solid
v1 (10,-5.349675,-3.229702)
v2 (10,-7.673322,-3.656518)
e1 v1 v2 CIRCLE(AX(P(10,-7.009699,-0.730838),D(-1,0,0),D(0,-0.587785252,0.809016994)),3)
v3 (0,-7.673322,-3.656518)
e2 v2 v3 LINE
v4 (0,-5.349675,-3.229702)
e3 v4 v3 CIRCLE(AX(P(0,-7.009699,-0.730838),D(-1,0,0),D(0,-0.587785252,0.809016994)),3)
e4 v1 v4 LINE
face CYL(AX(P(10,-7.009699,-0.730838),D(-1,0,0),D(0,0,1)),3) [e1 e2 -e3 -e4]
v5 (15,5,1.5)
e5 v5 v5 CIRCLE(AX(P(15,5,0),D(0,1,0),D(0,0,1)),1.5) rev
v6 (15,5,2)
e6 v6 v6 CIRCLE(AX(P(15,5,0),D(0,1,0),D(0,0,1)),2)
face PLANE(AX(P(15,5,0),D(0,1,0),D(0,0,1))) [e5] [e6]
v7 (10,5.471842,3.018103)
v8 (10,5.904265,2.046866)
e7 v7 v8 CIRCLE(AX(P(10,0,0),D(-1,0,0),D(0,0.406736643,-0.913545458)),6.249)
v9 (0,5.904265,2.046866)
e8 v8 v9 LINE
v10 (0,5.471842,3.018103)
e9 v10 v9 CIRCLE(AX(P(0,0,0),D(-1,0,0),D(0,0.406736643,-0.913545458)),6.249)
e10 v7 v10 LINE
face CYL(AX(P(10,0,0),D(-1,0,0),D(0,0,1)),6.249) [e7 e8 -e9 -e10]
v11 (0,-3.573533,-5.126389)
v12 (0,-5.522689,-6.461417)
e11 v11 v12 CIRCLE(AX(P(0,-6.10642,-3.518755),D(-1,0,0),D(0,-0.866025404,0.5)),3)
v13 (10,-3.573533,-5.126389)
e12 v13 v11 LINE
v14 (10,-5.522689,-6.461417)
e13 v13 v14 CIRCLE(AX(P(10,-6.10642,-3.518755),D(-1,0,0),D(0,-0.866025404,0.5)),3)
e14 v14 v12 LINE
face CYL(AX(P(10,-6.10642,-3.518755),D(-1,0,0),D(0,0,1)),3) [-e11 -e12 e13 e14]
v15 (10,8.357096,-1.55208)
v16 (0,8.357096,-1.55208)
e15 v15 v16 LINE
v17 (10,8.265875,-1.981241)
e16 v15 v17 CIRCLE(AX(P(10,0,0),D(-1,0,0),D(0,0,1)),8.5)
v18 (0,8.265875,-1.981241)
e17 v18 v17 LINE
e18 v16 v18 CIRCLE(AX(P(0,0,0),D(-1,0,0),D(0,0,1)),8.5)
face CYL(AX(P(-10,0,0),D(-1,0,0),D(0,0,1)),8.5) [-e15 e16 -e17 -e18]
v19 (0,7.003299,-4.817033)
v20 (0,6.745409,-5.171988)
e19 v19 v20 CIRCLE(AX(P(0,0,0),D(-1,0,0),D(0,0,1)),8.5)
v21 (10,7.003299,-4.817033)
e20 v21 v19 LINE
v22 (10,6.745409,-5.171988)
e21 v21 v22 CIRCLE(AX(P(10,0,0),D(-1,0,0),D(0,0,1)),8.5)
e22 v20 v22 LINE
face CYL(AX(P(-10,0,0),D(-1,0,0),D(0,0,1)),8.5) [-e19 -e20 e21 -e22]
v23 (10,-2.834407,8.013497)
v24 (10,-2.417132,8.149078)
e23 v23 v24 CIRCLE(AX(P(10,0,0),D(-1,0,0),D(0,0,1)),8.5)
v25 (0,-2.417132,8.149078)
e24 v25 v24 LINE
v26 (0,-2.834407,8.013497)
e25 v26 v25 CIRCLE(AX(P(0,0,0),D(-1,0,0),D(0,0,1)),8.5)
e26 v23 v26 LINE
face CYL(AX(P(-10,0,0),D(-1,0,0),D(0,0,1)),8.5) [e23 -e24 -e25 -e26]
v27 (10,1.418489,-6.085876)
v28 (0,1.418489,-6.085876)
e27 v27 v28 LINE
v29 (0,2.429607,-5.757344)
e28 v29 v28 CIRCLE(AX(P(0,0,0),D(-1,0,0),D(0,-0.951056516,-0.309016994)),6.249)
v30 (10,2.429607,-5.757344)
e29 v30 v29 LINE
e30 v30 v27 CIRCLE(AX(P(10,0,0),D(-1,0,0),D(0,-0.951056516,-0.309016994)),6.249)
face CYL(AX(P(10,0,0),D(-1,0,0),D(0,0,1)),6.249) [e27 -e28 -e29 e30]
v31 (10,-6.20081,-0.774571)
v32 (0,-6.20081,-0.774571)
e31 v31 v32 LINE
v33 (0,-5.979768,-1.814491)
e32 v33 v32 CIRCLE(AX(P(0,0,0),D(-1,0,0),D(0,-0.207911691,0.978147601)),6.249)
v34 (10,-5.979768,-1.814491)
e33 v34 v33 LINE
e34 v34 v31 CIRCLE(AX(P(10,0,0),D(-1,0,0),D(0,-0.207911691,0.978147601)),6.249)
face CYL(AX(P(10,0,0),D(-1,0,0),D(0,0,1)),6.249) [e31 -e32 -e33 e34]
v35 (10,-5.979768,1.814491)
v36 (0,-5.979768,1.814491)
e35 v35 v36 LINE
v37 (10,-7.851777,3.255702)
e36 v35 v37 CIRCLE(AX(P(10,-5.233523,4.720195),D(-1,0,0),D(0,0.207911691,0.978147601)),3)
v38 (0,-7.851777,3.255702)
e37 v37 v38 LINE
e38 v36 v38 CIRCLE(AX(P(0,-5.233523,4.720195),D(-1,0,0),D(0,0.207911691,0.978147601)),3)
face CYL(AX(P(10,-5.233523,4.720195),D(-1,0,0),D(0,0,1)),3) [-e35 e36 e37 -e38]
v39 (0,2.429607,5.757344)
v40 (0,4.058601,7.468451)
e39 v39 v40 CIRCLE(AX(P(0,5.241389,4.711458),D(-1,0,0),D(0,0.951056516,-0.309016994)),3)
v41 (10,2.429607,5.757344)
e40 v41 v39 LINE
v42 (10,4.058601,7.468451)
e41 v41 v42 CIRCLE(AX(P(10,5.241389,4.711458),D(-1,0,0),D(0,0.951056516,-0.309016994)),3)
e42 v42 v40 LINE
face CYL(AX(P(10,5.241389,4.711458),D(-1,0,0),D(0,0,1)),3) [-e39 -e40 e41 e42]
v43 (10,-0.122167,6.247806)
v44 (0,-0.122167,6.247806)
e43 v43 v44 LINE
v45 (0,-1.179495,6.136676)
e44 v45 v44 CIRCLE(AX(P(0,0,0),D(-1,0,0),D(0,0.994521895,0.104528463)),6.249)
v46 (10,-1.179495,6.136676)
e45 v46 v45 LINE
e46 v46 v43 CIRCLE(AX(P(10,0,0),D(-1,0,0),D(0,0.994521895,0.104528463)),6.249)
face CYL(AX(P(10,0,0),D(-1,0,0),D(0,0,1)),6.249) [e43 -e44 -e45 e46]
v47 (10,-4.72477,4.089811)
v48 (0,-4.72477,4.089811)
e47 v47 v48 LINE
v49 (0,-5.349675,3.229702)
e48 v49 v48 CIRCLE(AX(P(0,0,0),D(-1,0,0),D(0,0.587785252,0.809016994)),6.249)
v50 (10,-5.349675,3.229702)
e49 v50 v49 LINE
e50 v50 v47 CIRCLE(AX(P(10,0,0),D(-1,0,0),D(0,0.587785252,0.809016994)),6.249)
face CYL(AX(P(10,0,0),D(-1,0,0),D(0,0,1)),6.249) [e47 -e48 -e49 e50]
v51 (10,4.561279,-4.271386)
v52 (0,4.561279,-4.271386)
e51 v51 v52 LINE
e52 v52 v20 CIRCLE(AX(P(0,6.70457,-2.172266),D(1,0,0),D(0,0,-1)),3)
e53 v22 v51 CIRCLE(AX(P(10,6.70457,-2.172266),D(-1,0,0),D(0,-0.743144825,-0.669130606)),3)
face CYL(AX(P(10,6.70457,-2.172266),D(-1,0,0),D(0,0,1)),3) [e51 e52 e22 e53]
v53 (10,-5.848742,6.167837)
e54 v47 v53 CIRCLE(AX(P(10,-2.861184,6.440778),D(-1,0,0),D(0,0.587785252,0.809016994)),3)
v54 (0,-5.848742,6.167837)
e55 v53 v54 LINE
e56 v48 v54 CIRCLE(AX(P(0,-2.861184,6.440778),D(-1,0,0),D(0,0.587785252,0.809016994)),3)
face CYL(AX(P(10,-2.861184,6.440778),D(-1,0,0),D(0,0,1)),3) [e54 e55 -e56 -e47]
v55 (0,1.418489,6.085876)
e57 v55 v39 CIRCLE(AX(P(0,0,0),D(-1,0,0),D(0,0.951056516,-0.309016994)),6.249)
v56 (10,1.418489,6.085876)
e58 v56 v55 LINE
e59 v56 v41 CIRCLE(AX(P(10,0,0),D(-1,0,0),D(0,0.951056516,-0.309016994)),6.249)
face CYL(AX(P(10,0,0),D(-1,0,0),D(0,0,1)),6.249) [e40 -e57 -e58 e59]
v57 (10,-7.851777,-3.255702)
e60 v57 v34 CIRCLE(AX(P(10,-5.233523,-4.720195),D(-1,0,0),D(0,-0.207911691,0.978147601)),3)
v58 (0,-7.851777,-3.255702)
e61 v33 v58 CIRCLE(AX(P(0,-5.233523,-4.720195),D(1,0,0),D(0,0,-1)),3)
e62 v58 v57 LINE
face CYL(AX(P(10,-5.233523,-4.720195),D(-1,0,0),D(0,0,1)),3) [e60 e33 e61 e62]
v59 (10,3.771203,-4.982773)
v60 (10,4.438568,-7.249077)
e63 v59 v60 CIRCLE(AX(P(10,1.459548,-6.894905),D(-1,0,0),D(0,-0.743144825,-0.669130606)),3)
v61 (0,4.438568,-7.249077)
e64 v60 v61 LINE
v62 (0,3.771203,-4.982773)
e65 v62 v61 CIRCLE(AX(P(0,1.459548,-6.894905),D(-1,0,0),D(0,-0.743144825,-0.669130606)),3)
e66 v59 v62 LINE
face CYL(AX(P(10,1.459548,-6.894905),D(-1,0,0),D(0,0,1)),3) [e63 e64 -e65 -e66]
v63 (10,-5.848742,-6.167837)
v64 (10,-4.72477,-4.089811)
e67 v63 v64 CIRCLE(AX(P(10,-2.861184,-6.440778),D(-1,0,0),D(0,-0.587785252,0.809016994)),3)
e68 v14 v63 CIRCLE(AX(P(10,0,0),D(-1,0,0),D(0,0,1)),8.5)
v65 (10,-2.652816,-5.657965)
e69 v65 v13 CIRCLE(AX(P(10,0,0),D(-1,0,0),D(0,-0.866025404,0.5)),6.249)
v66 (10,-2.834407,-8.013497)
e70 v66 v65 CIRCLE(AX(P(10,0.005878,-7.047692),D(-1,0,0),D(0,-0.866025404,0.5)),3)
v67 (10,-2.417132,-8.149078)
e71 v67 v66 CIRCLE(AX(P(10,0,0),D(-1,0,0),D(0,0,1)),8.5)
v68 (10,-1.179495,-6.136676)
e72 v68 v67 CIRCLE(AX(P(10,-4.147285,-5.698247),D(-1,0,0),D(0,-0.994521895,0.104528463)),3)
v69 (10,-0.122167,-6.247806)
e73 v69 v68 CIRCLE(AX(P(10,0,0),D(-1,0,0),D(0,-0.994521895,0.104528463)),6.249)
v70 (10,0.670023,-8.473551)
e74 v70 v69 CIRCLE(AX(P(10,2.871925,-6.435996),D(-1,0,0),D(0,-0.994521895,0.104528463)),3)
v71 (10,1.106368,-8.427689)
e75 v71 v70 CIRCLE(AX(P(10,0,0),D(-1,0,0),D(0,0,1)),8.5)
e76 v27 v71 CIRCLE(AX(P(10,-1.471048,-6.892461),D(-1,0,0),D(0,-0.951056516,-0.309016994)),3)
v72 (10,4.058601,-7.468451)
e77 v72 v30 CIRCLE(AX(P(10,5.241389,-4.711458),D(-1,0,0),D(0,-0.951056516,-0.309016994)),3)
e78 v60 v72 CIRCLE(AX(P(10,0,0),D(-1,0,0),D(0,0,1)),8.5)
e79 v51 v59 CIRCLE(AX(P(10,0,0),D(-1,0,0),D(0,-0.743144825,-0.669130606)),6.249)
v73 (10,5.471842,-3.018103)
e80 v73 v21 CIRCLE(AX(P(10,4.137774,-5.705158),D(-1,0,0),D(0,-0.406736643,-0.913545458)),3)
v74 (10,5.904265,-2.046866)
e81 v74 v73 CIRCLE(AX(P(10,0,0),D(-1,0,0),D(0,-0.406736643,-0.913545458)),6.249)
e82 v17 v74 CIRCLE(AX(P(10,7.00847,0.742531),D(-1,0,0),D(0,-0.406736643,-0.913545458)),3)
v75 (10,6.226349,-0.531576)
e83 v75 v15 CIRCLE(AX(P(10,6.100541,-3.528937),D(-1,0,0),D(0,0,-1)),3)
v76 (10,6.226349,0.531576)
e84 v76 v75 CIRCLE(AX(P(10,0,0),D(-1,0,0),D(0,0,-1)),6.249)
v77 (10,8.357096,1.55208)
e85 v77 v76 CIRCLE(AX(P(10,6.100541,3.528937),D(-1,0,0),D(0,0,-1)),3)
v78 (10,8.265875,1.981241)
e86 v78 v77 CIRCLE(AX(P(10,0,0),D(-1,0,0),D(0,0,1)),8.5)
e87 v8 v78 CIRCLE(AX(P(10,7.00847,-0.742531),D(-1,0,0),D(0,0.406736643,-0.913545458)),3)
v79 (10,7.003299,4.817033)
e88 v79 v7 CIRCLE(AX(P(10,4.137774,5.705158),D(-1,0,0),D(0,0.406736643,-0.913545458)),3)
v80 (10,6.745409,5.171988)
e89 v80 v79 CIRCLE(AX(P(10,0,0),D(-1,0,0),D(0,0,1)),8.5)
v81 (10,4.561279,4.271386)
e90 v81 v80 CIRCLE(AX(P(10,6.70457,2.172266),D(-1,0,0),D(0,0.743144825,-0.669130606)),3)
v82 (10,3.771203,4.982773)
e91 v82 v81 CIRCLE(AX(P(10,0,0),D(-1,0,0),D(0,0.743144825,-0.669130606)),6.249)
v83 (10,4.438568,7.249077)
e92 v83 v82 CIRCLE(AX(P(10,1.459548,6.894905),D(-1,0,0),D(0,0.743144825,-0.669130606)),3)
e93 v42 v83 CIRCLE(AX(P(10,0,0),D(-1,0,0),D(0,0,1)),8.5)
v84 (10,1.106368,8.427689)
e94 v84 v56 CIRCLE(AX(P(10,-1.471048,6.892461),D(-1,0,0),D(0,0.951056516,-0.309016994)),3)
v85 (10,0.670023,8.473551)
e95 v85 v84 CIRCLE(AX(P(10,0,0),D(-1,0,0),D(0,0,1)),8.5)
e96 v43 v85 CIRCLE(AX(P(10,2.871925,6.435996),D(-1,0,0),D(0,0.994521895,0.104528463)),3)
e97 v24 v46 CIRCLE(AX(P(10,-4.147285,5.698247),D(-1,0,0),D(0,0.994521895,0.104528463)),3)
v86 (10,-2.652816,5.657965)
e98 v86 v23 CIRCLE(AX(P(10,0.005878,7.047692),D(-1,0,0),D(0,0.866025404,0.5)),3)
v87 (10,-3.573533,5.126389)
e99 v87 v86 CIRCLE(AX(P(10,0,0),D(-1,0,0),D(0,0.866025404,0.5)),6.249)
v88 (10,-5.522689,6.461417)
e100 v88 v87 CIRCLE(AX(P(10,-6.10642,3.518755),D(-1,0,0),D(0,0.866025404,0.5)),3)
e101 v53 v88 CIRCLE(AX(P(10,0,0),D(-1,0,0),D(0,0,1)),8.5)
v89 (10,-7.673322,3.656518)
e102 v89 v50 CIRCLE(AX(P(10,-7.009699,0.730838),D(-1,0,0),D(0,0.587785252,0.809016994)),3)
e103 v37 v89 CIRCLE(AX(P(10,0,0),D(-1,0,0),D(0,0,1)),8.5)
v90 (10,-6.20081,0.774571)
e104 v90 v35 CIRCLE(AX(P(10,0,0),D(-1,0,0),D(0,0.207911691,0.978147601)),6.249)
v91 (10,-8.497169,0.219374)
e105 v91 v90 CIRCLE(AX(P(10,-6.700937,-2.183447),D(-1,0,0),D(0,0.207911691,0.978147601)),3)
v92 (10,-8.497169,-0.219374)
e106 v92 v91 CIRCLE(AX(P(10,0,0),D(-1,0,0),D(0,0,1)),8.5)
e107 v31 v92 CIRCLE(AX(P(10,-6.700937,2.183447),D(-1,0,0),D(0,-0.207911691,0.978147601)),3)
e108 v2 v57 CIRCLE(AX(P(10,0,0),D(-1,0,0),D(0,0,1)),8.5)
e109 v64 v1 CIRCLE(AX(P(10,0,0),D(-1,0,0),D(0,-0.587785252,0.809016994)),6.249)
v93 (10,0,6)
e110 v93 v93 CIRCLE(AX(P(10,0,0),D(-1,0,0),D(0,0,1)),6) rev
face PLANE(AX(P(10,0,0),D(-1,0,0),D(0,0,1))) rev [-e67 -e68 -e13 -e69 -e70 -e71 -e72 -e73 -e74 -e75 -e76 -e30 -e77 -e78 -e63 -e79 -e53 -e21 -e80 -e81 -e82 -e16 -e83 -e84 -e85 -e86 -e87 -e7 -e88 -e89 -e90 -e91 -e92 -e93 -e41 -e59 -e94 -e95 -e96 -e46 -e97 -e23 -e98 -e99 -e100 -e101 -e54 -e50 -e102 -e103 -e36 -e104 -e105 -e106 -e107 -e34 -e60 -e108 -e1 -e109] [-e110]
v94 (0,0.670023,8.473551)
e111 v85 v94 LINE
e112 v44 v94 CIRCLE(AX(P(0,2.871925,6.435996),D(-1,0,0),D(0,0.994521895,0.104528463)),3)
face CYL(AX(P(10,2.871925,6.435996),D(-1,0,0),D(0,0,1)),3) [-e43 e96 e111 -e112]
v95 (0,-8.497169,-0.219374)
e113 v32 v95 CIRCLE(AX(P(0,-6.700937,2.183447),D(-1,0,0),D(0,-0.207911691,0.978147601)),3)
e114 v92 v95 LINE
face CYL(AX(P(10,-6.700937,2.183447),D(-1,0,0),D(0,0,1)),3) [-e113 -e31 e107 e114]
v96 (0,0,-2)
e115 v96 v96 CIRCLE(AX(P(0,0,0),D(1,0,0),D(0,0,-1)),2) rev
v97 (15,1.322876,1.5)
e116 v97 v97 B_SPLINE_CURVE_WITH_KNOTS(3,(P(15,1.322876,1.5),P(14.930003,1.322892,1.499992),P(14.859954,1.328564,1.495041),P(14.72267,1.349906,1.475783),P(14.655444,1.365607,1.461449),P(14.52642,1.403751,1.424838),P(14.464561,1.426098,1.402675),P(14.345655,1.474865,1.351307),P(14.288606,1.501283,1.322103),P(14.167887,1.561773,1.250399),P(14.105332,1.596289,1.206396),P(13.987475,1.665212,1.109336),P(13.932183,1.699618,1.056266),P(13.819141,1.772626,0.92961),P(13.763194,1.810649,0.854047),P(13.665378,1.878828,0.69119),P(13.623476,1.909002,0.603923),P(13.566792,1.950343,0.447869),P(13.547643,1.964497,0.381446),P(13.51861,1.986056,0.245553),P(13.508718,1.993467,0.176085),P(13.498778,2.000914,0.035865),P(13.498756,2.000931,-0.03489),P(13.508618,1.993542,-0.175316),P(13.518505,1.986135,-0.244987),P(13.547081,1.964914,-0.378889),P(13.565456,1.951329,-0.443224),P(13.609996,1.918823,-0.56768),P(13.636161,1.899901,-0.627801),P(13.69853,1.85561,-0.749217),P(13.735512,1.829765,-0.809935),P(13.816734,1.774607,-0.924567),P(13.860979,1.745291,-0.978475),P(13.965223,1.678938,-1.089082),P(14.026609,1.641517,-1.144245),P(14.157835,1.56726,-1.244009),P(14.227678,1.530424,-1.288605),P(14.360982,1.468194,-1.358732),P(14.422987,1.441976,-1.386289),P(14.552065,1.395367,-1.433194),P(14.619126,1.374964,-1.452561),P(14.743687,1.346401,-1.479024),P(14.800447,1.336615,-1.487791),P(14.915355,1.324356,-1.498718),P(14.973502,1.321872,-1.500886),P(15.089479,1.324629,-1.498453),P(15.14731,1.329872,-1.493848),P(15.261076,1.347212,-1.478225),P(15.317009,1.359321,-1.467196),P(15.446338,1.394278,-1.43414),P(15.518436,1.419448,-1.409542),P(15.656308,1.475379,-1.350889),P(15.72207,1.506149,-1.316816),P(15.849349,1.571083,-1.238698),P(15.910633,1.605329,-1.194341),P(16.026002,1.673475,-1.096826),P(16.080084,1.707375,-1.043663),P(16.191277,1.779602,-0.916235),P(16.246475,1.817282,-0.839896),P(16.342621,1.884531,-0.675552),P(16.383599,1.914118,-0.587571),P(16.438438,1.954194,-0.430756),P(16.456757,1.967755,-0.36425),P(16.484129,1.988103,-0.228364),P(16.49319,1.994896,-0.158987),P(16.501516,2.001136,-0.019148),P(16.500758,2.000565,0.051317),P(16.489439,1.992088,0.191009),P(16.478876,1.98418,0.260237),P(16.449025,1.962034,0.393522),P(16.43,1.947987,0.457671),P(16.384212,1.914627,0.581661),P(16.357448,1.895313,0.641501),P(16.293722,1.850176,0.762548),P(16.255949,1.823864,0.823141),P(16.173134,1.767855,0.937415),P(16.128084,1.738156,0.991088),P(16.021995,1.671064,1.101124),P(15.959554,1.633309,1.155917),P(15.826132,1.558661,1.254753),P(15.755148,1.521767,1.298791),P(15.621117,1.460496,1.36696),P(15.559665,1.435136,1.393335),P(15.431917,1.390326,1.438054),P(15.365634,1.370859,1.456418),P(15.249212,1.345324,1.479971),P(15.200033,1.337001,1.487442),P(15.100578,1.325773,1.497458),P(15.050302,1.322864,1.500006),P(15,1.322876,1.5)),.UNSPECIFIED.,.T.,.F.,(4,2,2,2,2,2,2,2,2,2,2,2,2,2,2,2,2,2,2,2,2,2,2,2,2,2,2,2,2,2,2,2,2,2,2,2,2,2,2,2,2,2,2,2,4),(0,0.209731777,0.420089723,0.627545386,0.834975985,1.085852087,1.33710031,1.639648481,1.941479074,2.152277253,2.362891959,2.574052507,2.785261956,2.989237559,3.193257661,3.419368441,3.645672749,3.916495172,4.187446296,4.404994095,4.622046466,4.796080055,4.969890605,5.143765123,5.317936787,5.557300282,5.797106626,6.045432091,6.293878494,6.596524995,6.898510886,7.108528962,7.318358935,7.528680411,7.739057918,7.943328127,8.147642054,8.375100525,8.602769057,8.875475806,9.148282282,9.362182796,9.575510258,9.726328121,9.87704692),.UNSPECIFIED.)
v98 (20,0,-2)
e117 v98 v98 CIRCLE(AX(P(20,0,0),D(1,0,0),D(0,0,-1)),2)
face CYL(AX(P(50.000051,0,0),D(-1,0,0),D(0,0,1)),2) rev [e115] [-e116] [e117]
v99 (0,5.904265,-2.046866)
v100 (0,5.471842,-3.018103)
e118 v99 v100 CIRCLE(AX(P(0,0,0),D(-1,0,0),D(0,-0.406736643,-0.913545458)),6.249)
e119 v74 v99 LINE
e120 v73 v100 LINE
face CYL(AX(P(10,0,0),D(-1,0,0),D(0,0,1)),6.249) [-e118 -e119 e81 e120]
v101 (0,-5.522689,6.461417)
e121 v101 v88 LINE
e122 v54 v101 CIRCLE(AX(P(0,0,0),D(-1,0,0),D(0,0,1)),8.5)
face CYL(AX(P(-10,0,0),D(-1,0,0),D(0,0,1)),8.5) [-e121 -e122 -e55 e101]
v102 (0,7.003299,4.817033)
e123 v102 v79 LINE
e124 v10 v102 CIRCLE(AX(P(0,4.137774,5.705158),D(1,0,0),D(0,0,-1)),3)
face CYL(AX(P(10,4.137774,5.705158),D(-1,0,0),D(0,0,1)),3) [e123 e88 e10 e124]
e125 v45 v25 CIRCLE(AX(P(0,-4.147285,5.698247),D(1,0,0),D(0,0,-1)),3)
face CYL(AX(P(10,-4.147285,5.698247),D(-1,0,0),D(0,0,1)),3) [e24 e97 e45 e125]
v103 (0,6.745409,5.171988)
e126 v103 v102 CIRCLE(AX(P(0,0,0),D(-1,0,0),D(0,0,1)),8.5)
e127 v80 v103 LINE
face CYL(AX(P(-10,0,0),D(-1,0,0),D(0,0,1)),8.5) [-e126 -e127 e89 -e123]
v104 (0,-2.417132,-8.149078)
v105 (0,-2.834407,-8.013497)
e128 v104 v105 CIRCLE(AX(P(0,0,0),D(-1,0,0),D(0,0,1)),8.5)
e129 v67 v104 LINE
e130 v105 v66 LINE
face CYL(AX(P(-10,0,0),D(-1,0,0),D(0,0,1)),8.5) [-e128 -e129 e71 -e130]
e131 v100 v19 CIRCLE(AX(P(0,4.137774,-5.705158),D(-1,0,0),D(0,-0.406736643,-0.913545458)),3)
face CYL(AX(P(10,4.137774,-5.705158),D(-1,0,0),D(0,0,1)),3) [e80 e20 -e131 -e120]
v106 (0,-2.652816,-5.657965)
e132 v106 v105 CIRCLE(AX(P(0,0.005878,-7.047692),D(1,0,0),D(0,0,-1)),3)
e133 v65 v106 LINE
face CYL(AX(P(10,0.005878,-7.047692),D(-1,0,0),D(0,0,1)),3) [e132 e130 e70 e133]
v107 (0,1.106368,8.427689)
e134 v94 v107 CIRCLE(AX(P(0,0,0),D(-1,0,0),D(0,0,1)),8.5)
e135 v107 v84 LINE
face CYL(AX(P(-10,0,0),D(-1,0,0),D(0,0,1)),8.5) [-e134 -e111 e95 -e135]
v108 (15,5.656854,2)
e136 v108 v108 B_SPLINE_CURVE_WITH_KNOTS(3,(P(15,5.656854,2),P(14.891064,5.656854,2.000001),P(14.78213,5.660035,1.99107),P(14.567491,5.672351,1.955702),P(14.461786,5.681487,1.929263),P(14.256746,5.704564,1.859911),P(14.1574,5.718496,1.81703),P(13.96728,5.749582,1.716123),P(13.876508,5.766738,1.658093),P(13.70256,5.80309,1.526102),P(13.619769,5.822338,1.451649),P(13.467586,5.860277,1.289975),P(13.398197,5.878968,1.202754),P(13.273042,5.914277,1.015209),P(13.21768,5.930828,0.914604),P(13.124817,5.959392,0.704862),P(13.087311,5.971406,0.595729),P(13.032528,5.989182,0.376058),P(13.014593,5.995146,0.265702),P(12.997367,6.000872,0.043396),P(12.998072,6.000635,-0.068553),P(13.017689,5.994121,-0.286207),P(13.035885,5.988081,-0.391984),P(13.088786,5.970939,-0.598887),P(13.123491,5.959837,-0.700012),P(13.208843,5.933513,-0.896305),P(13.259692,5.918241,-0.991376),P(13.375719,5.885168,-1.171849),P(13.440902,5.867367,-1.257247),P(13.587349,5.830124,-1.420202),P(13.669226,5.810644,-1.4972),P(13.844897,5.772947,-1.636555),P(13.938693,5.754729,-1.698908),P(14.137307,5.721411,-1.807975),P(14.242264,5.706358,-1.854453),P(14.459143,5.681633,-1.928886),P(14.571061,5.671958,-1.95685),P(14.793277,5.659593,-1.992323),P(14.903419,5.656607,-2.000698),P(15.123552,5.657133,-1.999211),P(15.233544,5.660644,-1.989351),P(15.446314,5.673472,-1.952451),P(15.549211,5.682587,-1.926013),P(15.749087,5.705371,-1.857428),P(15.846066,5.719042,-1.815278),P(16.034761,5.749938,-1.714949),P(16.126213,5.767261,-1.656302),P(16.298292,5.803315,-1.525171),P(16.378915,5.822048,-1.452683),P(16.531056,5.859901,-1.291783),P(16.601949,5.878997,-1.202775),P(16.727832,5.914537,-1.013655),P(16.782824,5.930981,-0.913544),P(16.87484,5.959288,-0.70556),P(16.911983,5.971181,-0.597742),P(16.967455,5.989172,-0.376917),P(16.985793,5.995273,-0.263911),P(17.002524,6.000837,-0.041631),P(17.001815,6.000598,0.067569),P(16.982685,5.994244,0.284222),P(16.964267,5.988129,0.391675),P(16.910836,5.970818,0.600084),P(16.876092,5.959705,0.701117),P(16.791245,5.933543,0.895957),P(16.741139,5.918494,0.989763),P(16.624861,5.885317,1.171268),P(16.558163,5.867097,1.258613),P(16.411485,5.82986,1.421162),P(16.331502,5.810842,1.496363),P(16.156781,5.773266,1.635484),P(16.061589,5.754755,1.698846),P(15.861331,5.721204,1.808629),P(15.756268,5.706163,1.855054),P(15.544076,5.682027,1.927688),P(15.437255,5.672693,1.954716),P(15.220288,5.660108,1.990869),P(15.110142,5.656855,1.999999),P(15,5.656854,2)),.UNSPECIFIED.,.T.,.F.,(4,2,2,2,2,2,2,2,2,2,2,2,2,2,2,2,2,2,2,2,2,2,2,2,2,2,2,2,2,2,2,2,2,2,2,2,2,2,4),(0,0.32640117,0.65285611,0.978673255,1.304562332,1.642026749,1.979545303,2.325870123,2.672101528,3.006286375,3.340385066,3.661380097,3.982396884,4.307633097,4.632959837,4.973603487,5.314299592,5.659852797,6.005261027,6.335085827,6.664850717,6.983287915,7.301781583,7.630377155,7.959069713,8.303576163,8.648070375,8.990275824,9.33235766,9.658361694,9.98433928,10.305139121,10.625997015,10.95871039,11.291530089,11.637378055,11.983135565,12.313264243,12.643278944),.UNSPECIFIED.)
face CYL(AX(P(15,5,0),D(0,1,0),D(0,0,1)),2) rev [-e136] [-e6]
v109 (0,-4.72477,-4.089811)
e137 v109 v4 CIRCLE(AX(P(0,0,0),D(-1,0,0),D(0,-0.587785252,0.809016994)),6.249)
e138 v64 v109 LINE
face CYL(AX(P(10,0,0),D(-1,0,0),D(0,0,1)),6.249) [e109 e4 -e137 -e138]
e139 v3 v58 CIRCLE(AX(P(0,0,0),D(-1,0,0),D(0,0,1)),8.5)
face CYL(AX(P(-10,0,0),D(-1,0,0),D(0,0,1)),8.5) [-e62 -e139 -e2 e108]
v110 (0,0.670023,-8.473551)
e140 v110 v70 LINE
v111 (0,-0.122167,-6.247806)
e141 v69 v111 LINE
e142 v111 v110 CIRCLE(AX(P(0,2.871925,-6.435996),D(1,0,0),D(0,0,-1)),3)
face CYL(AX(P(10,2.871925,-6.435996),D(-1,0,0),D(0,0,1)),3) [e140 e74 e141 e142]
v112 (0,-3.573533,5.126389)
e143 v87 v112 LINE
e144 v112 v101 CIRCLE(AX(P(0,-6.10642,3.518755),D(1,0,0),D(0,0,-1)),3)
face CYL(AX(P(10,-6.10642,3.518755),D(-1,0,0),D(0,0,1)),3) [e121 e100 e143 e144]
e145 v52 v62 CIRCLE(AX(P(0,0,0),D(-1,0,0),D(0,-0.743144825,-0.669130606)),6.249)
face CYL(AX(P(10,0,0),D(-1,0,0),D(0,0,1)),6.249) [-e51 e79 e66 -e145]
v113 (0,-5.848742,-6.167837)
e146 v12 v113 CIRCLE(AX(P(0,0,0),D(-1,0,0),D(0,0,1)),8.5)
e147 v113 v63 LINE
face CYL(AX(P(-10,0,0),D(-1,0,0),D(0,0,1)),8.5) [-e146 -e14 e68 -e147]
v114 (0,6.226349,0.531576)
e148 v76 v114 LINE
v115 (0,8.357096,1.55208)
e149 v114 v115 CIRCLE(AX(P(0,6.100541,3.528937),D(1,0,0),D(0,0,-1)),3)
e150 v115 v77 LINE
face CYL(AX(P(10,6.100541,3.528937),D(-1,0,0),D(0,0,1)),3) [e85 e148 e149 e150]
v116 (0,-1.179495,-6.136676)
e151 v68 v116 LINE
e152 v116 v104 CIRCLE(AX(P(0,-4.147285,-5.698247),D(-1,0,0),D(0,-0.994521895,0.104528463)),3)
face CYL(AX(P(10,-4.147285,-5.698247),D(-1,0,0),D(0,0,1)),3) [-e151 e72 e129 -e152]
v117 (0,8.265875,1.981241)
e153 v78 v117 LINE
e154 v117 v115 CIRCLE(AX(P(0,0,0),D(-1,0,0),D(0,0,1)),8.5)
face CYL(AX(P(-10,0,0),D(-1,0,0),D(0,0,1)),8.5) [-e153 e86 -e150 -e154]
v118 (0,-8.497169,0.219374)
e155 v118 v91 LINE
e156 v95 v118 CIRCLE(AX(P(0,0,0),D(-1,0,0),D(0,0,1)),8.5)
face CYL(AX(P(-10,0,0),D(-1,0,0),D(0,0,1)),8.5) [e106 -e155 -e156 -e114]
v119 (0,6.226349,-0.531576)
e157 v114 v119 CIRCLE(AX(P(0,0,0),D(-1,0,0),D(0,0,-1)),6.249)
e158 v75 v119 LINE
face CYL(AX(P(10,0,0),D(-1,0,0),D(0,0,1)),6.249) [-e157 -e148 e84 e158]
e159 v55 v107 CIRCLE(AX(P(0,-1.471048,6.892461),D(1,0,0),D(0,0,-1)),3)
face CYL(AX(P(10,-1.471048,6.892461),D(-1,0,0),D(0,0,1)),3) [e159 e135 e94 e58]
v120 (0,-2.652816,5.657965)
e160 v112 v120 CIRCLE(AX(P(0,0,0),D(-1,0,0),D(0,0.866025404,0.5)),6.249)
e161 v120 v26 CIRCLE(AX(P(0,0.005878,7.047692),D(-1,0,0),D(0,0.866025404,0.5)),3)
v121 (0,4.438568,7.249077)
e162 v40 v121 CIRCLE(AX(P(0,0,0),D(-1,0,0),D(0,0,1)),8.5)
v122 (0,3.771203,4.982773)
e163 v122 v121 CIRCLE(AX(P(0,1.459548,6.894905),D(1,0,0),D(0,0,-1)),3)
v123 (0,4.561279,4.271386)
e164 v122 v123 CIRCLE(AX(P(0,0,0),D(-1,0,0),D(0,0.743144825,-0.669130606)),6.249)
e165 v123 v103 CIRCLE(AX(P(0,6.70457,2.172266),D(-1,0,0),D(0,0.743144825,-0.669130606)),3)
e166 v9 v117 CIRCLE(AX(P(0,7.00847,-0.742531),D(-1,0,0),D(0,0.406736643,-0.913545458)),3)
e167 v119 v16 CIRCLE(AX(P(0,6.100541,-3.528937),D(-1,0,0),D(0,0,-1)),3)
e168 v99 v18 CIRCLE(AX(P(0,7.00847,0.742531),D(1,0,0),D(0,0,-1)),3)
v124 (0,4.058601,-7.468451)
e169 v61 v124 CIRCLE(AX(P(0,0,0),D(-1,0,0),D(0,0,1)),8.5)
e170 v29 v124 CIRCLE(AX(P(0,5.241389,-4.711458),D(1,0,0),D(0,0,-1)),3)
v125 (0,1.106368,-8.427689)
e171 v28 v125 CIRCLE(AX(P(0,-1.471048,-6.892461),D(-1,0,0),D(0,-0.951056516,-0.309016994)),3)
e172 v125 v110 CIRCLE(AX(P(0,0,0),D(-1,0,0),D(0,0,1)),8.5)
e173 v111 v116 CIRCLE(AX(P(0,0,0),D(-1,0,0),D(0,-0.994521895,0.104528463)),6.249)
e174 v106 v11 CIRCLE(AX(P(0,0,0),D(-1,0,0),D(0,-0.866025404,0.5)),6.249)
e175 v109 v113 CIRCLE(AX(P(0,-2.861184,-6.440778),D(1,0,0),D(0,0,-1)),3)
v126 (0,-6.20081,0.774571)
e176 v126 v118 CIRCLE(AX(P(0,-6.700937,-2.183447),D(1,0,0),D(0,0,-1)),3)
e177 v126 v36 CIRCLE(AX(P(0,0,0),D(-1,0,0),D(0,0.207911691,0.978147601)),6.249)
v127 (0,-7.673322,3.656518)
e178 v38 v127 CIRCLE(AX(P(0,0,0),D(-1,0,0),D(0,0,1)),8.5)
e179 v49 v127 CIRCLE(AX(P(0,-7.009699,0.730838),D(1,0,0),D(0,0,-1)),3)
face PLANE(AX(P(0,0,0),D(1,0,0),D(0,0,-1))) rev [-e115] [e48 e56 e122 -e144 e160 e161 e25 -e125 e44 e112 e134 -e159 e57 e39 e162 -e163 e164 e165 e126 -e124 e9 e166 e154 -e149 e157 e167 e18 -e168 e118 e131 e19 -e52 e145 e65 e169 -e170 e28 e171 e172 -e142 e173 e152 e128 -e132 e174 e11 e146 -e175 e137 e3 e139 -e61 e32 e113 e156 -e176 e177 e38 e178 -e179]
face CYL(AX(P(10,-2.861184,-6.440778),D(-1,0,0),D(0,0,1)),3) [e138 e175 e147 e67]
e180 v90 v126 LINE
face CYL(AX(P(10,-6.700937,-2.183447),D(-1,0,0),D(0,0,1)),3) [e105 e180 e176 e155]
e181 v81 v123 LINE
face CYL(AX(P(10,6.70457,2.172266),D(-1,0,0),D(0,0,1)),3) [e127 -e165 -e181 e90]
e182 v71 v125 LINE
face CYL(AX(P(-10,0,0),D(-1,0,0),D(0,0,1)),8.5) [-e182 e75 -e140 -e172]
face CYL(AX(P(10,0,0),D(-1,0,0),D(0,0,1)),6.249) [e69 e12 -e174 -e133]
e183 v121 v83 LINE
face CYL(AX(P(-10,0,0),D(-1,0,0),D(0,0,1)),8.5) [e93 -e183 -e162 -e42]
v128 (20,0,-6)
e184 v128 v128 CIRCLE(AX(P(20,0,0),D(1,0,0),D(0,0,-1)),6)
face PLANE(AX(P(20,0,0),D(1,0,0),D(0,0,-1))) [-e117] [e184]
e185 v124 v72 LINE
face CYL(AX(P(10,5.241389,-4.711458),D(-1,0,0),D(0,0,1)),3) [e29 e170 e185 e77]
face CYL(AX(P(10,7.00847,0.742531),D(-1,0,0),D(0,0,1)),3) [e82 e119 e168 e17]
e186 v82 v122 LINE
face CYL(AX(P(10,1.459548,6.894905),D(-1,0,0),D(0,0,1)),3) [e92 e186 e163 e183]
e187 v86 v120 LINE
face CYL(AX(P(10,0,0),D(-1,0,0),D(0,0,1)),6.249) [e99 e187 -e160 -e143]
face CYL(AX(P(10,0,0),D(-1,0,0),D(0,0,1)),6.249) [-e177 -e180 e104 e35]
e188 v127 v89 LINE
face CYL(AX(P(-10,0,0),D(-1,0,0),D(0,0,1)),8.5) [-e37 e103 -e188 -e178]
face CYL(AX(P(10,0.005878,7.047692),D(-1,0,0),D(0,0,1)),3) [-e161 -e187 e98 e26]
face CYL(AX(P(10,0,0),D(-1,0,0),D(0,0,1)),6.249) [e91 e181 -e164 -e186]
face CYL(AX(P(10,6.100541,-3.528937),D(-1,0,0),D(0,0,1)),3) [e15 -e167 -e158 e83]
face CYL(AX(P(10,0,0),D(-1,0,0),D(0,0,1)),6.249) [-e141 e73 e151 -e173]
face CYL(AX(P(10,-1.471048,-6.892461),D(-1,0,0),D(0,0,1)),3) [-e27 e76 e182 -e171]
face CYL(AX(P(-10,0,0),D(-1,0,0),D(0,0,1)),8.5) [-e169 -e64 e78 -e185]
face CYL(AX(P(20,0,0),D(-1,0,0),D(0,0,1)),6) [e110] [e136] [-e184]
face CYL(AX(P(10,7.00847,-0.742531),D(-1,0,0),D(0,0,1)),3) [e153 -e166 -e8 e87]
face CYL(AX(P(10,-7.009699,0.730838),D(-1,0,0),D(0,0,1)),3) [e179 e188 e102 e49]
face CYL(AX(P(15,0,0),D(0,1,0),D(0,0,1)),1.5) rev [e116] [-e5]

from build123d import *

# Parameters (mm, degrees)
STOCK_GEAR_1M_15T_D4_START_1_OUTLINE_R = 2
STOCK_GEAR_1M_15T_D4_START_1_DEPTH     = 10
SKETCH1_R                              = 6
SKETCH1_R_2                            = 2
BOSS_EXTRUDE1_DEPTH                    = 10
SKETCH2_R                              = 1.5
CUT_EXTRUDE2_DEPTH                     = 6
SKETCH2_3_R                            = 2
CUT_EXTRUDE3_DEPTH                     = 1


# Read off the part's stored shape, not the designer's step: Stock-Gear 1M 15T D4 Start-1
with BuildPart() as part:
    # Stock-Gear 1M 15T D4 Start-1 outline → Stock-Gear 1M 15T D4 Start-1 (new body)
    with BuildSketch(Plane.YZ):
        with BuildLine():
            ThreePointArc((1.106368468, 8.427689411), (0.888491938, 8.453436111), (0.670023493, 8.473551116))
            ThreePointArc((0.670023493, 8.473551116), (0.04560728, 7.441942771), (-0.122166634, 6.24780572))
            ThreePointArc((-0.122166634, 6.24780572), (-0.653198367, 6.214767324), (-1.179494851, 6.136676046))
            ThreePointArc((-1.179494851, 6.136676046), (-1.591877556, 7.26983618), (-2.417132211, 8.149077977))
            ThreePointArc((-2.417132211, 8.149077977), (-2.626644452, 8.083980389), (-2.834406818, 8.013497238))
            ThreePointArc((-2.834406818, 8.013497238), (-2.985246497, 6.817103167), (-2.652816299, 5.657964889))
            ThreePointArc((-2.652816299, 5.657964889), (-3.1245, 5.411792748), (-3.573533178, 5.126388751))
            ThreePointArc((-3.573533178, 5.126388751), (-4.411161274, 5.993850886), (-5.522688773, 6.461416928))
            ThreePointArc((-5.522688773, 6.461416928), (-5.687610154, 6.316731017), (-5.84874244, 6.167836888))
            ThreePointArc((-5.84874244, 6.167836888), (-5.499924035, 5.013524493), (-4.724769925, 4.089810528))
            ThreePointArc((-4.724769925, 4.089810528), (-5.055547198, 3.673070042), (-5.349675154, 3.229702268))
            ThreePointArc((-5.349675154, 3.229702268), (-6.467715133, 3.681474322), (-7.673322273, 3.656518192))
            ThreePointArc((-7.673322273, 3.656518192), (-7.76513639, 3.457261466), (-7.851777359, 3.255701506))
            ThreePointArc((-7.851777359, 3.255701506), (-7.063614741, 2.343061888), (-5.979767908, 1.814490772))
            ThreePointArc((-5.979767908, 1.814490772), (-6.112444357, 1.299240156), (-6.200809696, 0.774570923))
            ThreePointArc((-6.200809696, 0.774570923), (-7.405942289, 0.732537403), (-8.497168643, 0.219374243))
            ThreePointArc((-8.497168643, 0.219374243), (-8.5, 0), (-8.497168643, -0.219374243))
            ThreePointArc((-8.497168643, -0.219374243), (-7.405942289, -0.732537403), (-6.200809696, -0.774570923))
            ThreePointArc((-6.200809696, -0.774570923), (-6.112444357, -1.299240156), (-5.979767908, -1.814490772))
            ThreePointArc((-5.979767908, -1.814490772), (-7.063614741, -2.343061888), (-7.851777359, -3.255701506))
            ThreePointArc((-7.851777359, -3.255701506), (-7.76513639, -3.457261466), (-7.673322273, -3.656518192))
            ThreePointArc((-7.673322273, -3.656518192), (-6.467715133, -3.681474322), (-5.349675154, -3.229702268))
            ThreePointArc((-5.349675154, -3.229702268), (-5.055547198, -3.673070042), (-4.724769925, -4.089810528))
            ThreePointArc((-4.724769925, -4.089810528), (-5.499924035, -5.013524493), (-5.84874244, -6.167836888))
            ThreePointArc((-5.84874244, -6.167836888), (-5.687610154, -6.316731017), (-5.522688773, -6.461416928))
            ThreePointArc((-5.522688773, -6.461416928), (-4.411161274, -5.993850886), (-3.573533178, -5.126388751))
            ThreePointArc((-3.573533178, -5.126388751), (-3.1245, -5.411792748), (-2.652816299, -5.657964889))
            ThreePointArc((-2.652816299, -5.657964889), (-2.985246497, -6.817103167), (-2.834406818, -8.013497238))
            ThreePointArc((-2.834406818, -8.013497238), (-2.626644452, -8.083980389), (-2.417132211, -8.149077977))
            ThreePointArc((-2.417132211, -8.149077977), (-1.591877556, -7.26983618), (-1.179494851, -6.136676046))
            ThreePointArc((-1.179494851, -6.136676046), (-0.653198367, -6.214767324), (-0.122166634, -6.24780572))
            ThreePointArc((-0.122166634, -6.24780572), (0.04560728, -7.441942771), (0.670023493, -8.473551116))
            ThreePointArc((0.670023493, -8.473551116), (0.888491938, -8.453436111), (1.106368468, -8.427689411))
            ThreePointArc((1.106368468, -8.427689411), (1.502656253, -7.288800753), (1.418488851, -6.085876303))
            ThreePointArc((1.418488851, -6.085876303), (1.931047198, -5.94315217), (2.429606752, -5.757344182))
            ThreePointArc((2.429606752, -5.757344182), (3.068575145, -6.780002862), (4.058600654, -7.468451026))
            ThreePointArc((4.058600654, -7.468451026), (4.25, -7.361215932), (4.438567989, -7.249076783))
            ThreePointArc((4.438567989, -7.249076783), (4.337367144, -6.04746546), (3.771202944, -4.982773259))
            ThreePointArc((3.771202944, -4.982773259), (4.181397159, -4.643912014), (4.561279057, -4.271385532))
            ThreePointArc((4.561279057, -4.271385532), (5.560958489, -4.945738865), (6.745408891, -5.171987905))
            ThreePointArc((6.745408891, -5.171987905), (6.876644452, -4.996174644), (7.003298781, -4.817032924))
            ThreePointArc((7.003298781, -4.817032924), (6.422107853, -3.760468449), (5.471841788, -3.018103451))
            ThreePointArc((5.471841788, -3.018103451), (5.708745565, -2.541697283), (5.904264776, -2.046865518))
            ThreePointArc((5.904264776, -2.046865518), (7.091801591, -2.256311686), (8.265874651, -1.981241089))
            ThreePointArc((8.265874651, -1.981241089), (8.314254606, -1.767249372), (8.357095591, -1.55208031))
            ThreePointArc((8.357095591, -1.55208031), (7.396407771, -0.823252281), (6.226349477, -0.531576138))
            ThreePointArc((6.226349477, -0.531576138), (6.249, 0), (6.226349477, 0.531576138))
            ThreePointArc((6.226349477, 0.531576138), (7.396407771, 0.823252281), (8.357095591, 1.55208031))
            ThreePointArc((8.357095591, 1.55208031), (8.314254606, 1.767249372), (8.265874651, 1.981241089))
            ThreePointArc((8.265874651, 1.981241089), (7.091801591, 2.256311686), (5.904264776, 2.046865518))
            ThreePointArc((5.904264776, 2.046865518), (5.708745565, 2.541697283), (5.471841788, 3.018103451))
            ThreePointArc((5.471841788, 3.018103451), (6.422107853, 3.760468449), (7.003298781, 4.817032924))
            ThreePointArc((7.003298781, 4.817032924), (6.876644452, 4.996174644), (6.745408891, 5.171987905))
            ThreePointArc((6.745408891, 5.171987905), (5.560958489, 4.945738865), (4.561279057, 4.271385532))
            ThreePointArc((4.561279057, 4.271385532), (4.181397159, 4.643912014), (3.771202944, 4.982773259))
            ThreePointArc((3.771202944, 4.982773259), (4.337367144, 6.04746546), (4.438567989, 7.249076783))
            ThreePointArc((4.438567989, 7.249076783), (4.25, 7.361215932), (4.058600654, 7.468451026))
            ThreePointArc((4.058600654, 7.468451026), (3.068575145, 6.780002862), (2.429606752, 5.757344182))
            ThreePointArc((2.429606752, 5.757344182), (1.931047198, 5.94315217), (1.418488851, 6.085876303))
            ThreePointArc((1.418488851, 6.085876303), (1.502656253, 7.288800753), (1.106368468, 8.427689411))
        make_face()
        Circle(STOCK_GEAR_1M_15T_D4_START_1_OUTLINE_R, mode=Mode.SUBTRACT)
    extrude(amount=STOCK_GEAR_1M_15T_D4_START_1_DEPTH)

    # Sketch1 → Boss-Extrude1 (add)
    with BuildSketch(Plane(origin=(10, 0, 0), x_dir=(0, 0, -1), z_dir=(1, 0, 0))):
        with Locations(Location((0, 0, 0), (0, 0, 180))):
            Circle(SKETCH1_R)
        Circle(SKETCH1_R_2, mode=Mode.SUBTRACT)
    extrude(amount=BOSS_EXTRUDE1_DEPTH)

    # Sketch2 → Cut-Extrude2 (cut)
    with BuildSketch(Plane(origin=(0, 6, 0), x_dir=(1, 0, 0), z_dir=(0, 1, 0))):
        with Locations(Location((15, 0, 0), (0, 0, 270))):
            Circle(SKETCH2_R)
    extrude(amount=-CUT_EXTRUDE2_DEPTH, mode=Mode.SUBTRACT)

    # Sketch2<3> → Cut-Extrude3 (cut)
    with BuildSketch(Plane(origin=(0, 6, 0), x_dir=(1, 0, 0), z_dir=(0, 1, 0))):
        with Locations(Location((15, 0, 0), (0, 0, 270))):
            Circle(SKETCH2_3_R)
    extrude(amount=-CUT_EXTRUDE3_DEPTH, mode=Mode.SUBTRACT)


solid = part.part
